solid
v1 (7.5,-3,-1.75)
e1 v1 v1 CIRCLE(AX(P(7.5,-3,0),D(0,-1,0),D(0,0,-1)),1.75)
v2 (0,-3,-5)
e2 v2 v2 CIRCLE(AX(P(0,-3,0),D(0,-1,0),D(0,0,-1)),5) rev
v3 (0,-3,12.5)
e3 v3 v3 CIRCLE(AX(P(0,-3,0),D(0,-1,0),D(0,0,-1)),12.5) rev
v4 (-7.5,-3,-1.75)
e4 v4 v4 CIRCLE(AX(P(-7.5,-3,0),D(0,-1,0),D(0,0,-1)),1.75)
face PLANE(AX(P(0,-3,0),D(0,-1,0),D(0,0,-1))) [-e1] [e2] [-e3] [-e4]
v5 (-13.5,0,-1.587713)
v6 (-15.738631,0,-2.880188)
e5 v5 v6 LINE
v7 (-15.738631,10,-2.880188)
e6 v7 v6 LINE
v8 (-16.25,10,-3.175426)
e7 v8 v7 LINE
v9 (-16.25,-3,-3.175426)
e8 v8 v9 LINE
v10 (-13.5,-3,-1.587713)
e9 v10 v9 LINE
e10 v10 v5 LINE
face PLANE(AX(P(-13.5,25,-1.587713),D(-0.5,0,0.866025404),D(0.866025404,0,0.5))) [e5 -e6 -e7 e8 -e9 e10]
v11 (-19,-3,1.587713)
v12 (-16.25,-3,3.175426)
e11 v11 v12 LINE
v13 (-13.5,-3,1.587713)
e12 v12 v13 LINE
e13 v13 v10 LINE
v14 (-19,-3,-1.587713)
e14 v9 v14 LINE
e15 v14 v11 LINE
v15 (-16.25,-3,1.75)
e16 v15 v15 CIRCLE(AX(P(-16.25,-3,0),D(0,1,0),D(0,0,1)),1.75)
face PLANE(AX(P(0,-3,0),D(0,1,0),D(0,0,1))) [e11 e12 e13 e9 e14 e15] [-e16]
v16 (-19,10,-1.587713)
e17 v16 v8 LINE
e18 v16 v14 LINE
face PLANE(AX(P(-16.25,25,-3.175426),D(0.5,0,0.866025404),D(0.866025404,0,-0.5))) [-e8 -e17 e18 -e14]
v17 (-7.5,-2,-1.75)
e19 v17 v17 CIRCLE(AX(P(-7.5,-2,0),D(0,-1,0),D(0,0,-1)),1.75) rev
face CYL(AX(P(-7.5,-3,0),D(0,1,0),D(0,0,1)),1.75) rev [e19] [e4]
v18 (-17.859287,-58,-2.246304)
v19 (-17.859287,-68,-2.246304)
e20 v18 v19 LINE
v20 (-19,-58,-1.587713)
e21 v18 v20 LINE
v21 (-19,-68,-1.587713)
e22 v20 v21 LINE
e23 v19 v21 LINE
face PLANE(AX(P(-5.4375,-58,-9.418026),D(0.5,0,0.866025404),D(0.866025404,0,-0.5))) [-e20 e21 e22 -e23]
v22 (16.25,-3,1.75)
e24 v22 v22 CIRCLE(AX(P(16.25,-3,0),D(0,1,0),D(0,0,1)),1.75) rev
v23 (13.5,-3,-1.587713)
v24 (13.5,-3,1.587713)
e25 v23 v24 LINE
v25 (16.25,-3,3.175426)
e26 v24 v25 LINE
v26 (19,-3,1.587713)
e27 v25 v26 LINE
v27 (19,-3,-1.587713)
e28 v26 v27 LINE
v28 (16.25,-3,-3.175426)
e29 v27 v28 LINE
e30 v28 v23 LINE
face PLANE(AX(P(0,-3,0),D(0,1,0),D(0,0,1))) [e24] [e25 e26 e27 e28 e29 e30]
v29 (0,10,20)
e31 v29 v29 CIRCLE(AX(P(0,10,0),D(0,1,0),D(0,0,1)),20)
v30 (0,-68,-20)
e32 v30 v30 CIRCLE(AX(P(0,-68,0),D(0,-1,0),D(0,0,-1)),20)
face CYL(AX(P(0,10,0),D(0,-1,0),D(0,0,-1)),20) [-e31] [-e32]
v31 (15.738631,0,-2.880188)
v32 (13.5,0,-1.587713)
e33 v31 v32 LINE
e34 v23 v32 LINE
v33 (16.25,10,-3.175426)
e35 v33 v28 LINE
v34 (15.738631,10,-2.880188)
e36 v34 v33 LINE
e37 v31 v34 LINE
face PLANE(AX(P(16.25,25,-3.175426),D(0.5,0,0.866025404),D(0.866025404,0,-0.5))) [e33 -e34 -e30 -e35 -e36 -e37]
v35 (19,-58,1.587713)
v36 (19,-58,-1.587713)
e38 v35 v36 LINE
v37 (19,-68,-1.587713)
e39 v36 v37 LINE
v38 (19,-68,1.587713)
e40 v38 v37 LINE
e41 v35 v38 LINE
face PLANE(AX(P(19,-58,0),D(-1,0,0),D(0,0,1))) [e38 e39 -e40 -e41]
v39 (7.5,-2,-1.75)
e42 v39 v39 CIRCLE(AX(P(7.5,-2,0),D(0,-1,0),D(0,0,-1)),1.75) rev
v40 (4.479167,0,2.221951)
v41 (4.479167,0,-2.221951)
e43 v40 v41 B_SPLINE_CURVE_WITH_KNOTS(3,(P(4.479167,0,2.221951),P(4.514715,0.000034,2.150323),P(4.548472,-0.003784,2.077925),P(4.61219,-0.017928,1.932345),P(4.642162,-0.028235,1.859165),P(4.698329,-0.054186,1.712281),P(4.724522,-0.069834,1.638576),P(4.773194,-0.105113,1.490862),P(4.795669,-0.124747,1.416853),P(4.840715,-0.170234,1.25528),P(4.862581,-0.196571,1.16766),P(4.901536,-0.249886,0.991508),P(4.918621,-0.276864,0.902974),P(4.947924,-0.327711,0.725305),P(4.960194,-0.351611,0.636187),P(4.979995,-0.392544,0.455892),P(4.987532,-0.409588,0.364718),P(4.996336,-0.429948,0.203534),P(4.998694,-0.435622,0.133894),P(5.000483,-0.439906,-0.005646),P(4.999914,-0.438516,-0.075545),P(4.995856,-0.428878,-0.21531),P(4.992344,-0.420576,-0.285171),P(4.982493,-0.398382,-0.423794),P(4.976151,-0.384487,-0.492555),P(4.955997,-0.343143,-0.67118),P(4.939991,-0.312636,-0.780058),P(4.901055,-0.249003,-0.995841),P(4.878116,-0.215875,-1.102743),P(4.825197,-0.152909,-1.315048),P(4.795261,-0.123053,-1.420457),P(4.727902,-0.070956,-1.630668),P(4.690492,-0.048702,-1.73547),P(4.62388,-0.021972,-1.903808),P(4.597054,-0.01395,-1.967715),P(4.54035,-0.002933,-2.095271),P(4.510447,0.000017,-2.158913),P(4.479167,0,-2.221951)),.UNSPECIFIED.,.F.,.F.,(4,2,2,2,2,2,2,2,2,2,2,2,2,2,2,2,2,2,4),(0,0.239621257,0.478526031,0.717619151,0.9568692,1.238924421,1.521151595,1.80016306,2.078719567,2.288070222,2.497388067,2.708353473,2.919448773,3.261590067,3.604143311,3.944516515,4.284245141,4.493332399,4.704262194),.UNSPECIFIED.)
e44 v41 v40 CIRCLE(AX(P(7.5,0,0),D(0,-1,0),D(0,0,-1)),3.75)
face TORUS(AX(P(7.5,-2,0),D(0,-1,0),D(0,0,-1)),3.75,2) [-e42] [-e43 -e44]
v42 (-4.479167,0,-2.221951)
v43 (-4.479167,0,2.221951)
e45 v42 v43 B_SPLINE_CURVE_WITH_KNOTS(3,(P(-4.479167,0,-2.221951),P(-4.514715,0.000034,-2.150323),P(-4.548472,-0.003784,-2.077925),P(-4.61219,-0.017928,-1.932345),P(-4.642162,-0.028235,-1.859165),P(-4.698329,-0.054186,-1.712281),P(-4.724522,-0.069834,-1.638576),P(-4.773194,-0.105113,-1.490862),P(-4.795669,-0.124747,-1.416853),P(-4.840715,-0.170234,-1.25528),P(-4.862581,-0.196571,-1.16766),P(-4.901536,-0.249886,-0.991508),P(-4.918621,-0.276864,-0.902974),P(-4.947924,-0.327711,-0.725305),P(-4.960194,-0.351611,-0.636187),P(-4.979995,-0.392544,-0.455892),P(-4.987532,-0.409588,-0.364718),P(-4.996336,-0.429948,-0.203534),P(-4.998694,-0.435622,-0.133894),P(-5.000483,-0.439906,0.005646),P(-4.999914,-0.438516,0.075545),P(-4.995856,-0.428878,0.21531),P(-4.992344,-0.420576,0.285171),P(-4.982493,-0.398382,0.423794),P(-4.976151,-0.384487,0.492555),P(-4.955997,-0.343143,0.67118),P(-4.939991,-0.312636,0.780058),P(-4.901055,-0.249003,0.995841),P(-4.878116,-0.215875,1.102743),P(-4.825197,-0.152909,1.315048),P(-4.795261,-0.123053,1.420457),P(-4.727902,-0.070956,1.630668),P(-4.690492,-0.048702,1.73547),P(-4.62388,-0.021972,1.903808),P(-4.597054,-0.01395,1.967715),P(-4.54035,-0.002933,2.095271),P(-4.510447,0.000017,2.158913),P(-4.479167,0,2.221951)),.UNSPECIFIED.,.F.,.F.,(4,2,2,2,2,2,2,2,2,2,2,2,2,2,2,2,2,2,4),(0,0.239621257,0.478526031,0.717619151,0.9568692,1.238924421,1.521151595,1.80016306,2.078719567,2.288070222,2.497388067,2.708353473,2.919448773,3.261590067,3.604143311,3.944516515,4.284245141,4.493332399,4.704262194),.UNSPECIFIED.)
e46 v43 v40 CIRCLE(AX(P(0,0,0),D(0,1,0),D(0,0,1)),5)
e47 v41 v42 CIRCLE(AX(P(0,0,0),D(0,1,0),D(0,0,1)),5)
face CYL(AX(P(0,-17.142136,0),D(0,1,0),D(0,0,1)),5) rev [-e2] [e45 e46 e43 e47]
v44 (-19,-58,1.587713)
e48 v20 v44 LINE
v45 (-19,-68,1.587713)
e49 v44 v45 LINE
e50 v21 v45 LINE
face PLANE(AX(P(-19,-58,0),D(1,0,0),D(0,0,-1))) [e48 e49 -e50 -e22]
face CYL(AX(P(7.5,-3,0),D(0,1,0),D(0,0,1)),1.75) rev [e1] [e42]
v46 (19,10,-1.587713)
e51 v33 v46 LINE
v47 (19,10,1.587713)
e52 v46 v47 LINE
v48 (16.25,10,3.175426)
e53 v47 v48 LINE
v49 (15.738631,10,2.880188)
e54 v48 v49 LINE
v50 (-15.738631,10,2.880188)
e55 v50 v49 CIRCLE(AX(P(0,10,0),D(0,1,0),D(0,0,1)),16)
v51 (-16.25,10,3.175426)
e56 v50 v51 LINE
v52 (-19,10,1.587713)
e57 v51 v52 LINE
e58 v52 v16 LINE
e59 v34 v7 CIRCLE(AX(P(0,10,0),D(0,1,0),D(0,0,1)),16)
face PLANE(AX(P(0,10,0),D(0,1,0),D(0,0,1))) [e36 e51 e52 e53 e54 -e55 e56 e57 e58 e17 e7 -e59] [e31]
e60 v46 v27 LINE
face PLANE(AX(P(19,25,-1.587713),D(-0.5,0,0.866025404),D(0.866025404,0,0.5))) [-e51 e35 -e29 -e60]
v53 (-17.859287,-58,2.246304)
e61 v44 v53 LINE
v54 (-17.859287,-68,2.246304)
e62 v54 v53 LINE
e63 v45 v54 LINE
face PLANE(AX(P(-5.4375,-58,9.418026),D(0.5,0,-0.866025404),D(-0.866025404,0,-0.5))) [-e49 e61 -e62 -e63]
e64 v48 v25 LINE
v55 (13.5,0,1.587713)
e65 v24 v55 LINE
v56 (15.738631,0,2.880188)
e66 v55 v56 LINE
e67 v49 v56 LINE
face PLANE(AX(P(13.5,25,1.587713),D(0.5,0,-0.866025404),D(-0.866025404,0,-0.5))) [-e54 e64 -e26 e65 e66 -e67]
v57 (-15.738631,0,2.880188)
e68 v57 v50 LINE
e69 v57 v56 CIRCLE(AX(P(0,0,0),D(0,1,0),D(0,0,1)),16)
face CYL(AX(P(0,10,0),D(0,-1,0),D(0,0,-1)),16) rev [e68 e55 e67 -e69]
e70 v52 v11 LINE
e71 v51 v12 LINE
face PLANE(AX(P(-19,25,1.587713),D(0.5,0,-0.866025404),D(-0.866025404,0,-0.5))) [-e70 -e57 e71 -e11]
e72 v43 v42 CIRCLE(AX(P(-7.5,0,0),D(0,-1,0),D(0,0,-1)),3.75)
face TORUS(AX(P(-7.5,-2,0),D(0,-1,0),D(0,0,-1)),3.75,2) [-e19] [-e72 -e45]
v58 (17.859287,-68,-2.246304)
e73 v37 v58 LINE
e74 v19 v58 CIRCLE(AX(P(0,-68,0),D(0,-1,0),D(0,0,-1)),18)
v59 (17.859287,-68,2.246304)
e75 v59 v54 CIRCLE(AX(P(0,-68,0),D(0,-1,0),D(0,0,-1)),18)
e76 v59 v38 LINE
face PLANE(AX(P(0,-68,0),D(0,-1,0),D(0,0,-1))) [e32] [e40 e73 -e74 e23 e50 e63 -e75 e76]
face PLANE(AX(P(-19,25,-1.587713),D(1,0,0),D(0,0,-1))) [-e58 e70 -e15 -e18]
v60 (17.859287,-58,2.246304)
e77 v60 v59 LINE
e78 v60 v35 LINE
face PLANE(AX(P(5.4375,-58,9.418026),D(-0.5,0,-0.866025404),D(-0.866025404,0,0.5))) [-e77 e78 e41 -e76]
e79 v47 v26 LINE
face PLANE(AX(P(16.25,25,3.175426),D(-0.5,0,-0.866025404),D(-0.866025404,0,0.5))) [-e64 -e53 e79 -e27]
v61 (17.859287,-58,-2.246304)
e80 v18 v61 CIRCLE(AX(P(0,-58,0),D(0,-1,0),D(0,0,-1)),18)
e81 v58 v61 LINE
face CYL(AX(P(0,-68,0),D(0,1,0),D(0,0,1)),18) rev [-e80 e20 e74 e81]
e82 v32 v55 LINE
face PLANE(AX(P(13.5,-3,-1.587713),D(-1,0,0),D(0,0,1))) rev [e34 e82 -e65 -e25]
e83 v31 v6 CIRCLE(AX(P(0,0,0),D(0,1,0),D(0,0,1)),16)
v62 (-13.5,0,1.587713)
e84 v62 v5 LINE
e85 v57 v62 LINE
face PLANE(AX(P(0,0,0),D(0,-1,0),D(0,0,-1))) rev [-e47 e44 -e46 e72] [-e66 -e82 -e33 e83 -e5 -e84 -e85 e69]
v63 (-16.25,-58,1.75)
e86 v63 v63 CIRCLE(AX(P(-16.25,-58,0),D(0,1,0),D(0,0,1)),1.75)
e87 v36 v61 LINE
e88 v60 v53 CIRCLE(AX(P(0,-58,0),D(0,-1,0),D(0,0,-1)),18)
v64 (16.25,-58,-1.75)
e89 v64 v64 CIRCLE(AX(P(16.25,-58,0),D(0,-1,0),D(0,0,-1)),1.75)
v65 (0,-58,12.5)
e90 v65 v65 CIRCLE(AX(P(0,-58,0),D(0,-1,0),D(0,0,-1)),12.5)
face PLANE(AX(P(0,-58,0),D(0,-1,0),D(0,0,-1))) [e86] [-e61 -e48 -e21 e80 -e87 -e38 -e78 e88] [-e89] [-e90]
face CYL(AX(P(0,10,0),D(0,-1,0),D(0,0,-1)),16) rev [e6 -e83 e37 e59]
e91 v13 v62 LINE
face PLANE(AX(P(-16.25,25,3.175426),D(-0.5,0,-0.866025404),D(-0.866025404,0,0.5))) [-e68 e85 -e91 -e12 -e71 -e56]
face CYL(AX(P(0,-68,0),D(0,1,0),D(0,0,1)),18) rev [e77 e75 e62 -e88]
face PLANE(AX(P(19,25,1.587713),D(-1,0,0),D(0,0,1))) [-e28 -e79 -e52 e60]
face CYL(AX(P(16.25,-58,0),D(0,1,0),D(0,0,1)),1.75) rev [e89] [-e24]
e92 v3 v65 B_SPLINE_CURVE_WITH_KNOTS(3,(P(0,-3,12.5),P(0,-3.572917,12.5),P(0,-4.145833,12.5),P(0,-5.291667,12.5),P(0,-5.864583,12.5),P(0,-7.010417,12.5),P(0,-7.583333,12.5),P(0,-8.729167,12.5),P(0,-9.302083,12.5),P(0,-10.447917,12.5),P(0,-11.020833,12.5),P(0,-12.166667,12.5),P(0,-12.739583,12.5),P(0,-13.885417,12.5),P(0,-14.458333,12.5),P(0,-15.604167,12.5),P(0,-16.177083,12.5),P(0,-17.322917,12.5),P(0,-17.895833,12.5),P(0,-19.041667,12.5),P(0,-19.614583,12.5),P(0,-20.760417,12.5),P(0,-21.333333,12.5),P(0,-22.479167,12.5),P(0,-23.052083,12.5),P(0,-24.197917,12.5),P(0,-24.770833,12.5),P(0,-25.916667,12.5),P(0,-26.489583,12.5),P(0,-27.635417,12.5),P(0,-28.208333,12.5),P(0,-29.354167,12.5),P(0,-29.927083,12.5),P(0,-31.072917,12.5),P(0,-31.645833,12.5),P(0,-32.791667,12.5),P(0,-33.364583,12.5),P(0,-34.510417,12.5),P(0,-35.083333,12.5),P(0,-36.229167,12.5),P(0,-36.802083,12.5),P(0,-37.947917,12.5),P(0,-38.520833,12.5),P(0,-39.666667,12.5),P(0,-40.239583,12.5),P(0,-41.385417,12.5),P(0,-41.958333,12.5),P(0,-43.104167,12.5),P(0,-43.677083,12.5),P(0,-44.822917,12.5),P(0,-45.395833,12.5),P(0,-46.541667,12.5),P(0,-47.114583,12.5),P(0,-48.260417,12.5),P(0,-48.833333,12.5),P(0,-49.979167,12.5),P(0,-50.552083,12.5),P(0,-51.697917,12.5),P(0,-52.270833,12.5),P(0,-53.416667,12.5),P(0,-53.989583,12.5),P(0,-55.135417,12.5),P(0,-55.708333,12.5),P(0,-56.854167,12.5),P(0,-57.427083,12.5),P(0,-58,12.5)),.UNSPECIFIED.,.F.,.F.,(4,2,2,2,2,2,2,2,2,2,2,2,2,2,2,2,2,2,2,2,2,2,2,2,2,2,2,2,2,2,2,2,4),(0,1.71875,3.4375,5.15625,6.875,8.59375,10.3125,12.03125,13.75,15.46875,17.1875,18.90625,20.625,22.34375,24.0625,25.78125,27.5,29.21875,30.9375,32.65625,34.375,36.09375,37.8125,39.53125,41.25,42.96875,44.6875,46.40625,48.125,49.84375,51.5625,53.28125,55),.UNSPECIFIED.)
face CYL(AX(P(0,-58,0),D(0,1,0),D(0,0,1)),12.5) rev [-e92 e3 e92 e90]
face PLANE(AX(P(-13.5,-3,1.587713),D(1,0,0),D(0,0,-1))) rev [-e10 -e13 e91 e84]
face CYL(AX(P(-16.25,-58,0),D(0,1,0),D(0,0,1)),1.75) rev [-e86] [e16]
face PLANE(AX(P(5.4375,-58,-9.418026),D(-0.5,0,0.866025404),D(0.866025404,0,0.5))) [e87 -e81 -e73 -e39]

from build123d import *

# Parameters (mm, degrees)
SKETCH1_R                 = 20
SKETCH1_R_2               = 16
BOSS_EXTRUDE1_DEPTH       = 10
SKETCH2_R                 = 1.75
BOSS_EXTRUDE2_DEPTH       = 3
BOSS_EXTRUDE2_2_DEPTH     = 3
BOSS_EXTRUDE3_OUTLINE_R   = 16
BOSS_EXTRUDE3_OUTLINE_R_2 = 12.5
BOSS_EXTRUDE3_DEPTH       = 58
FILLET1_R                 = 5
BOSS_EXTRUDE4_START       = 10
SKETCH3_R                 = 20
SKETCH3_R_2               = 14.5
BOSS_EXTRUDE4_DEPTH       = 10
CUT_EXTRUDE1_DEPTH        = 25
CUT_EXTRUDE2_DEPTH        = 3
BOSS_EXTRUDE5_START       = 48
SKETCH5_R                 = 20
SKETCH5_R_2               = 12.5
BOSS_EXTRUDE5_DEPTH       = 48
SKETCH6_R                 = 1.75
BOSS_EXTRUDE7_DEPTH       = 3
SKETCH7_R                 = 5
CUT_EXTRUDE3_DEPTH        = 3
CUT_EXTRUDE4_DEPTH        = 62.846584384
CUT_EXTRUDE4_DEPTH_BACK   = 62.846584384
SKETCH9_R                 = 1.75
BOSS_EXTRUDE8_START       = 10
SKETCH10_R                = 20
SKETCH10_R_2              = 18
BOSS_EXTRUDE8_DEPTH       = 10
FILLET5_R                 = 2
CUT_EXTRUDE5_START        = 39.893559
CUT_EXTRUDE5_DEPTH        = 10


# Read off the part's stored shape, not the designer's step: Boss-Extrude3
with BuildPart() as part:
    # Sketch1 → Boss-Extrude1 (new body)
    with BuildSketch(Plane(origin=(0, 0, 0), x_dir=(1, 0, 0), z_dir=(0, 1, 0))):
        with Locations(Location((0, 0, 0), (0, 0, 270))):
            Circle(SKETCH1_R)
        with Locations(Location((0, 0, 0), (0, 0, 270))):
            Circle(SKETCH1_R_2, mode=Mode.SUBTRACT)
    extrude(amount=BOSS_EXTRUDE1_DEPTH)



with BuildPart() as body_2:
    # Sketch2 → Boss-Extrude2 (new body)
    with BuildSketch(Plane(origin=(0, 0, 0), x_dir=(-1, 0, 0), z_dir=(0, -1, 0))):
        with BuildLine():
            Line((-9.387458609, 2), (-15.874507866, 2))
            ThreePointArc((-15.874507866, 2), (-16, 0), (-15.874507866, -2))
            Line((-15.874507866, -2), (-9.387458609, -2))
            ThreePointArc((-9.387458609, -2), (-4.75, 0), (-9.387458609, 2))
        make_face()
        with Locations(Location((-7.5, 0, 0), (0, 0, 90))):
            Circle(SKETCH2_R, mode=Mode.SUBTRACT)
    extrude(amount=BOSS_EXTRUDE2_DEPTH)


with BuildPart() as body_3:
    # Sketch2 → Boss-Extrude2 2 (new body)
    with BuildSketch(Plane(origin=(0, 0, 0), x_dir=(-1, 0, 0), z_dir=(0, -1, 0))):
        with BuildLine():
            Line((9.387458609, -2), (15.874507866, -2))
            ThreePointArc((15.874507866, -2), (16, 0), (15.874507866, 2))
            Line((15.874507866, 2), (9.387458609, 2))
            ThreePointArc((9.387458609, 2), (4.75, 0), (9.387458609, -2))
        make_face()
        with Locations(Location((7.5, 0, 0), (0, 0, 90))):
            Circle(SKETCH2_R, mode=Mode.SUBTRACT)
    extrude(amount=BOSS_EXTRUDE2_2_DEPTH)


    add(body_2.part)  # Boss-Extrude3 merges body 2
    # Boss-Extrude3 outline → Boss-Extrude3 (add)
    with BuildSketch(Plane(origin=(0, 0, 0), x_dir=(-1, 0, 0), z_dir=(0, -1, 0))):
        Circle(BOSS_EXTRUDE3_OUTLINE_R)
        Circle(BOSS_EXTRUDE3_OUTLINE_R_2, mode=Mode.SUBTRACT)
    extrude(amount=BOSS_EXTRUDE3_DEPTH)

    # Fillet1
    # the kernel refuses this fillet: 5 mm, written as the material it adds along each edge
    with BuildSketch(Plane(origin=(-12.338962679, -3, 2), x_dir=(0.44041013703938037, 0, 0.8977966981410402), z_dir=(0, 1, 0)), Plane(origin=(12.338962679, -3, -2), x_dir=(-0.4404101370393726, 0, -0.897796698141044), z_dir=(0, 1, 0))) as fillet1_piece_1:
        with BuildLine():
            CenterArc((5.821777357, 4.78348009), FILLET1_R, 205.259956012, 81.663200185)
            Line((1.299872312, 2.649850609), (1.209434211, 2.607178019))
            ThreePointArc((1.209434211, 2.607178019), (0.560156486, 1.368966318), (-0.08977967, 0.044041014))
            Line((-0.08977967, 0.044041014), (-0.029108887, -0.095669602))
            ThreePointArc((-0.029108887, -0.095669602), (3.638610848, -0.641299774), (7.306330583, -0.095669602))
            Line((7.306330583, -0.095669602), (7.277221696, 0))
        make_face()
    extrude(amount=3)
    with BuildSketch(Plane(origin=(-12.338962679, -3, -2), x_dir=(0.44041013703938064, 0, -0.8977966981410401), z_dir=(0, 1, 0)), Plane(origin=(12.338962679, -3, 2), x_dir=(-0.44041013703937265, 0, 0.8977966981410441), z_dir=(0, 1, 0))) as fillet1_piece_2:
        with BuildLine():
            CenterArc((5.821777357, -4.78348009), FILLET1_R, 73.076843803, 81.663200185)
            Line((1.299872312, -2.649850609), (1.209434211, -2.607178019))
            ThreePointArc((1.209434211, -2.607178019), (0.560156486, -1.368966318), (-0.08977967, -0.044041014))
            Line((-0.08977967, -0.044041014), (-0.029108887, 0.095669602))
            ThreePointArc((-0.029108887, 0.095669602), (3.638610848, 0.641299774), (7.306330583, 0.095669602))
            Line((7.306330583, 0.095669602), (7.277221696, 0))
        make_face()
    extrude(amount=3)


with BuildPart() as part_1:
    add(part.part)

    add(body_3.part)  # Boss-Extrude4 merges body 3
    # Sketch3 → Boss-Extrude4 (add)
    with BuildSketch(Plane(origin=(0, 0, 0), x_dir=(-1, 0, 0), z_dir=(0, -1, 0)).offset(BOSS_EXTRUDE4_START)):
        with Locations(Location((0, 0, 0), (0, 0, 90))):
            Circle(SKETCH3_R)
        Circle(SKETCH3_R_2, mode=Mode.SUBTRACT)
    extrude(amount=-BOSS_EXTRUDE4_DEPTH)

    # Sketch4 → Cut-Extrude1 (cut)
    with BuildSketch(Plane(origin=(0, 0, 0), x_dir=(1, 0, 0), z_dir=(0, 1, 0))):
        Polygon((-16.25, 3.175426481), (-19, 1.58771324), (-19, -1.58771324), (-16.25, -3.175426481), (-13.5, -1.58771324), (-13.5, 1.58771324), align=None)
        Polygon((16.25, 3.175426481), (13.5, 1.58771324), (13.5, -1.58771324), (16.25, -3.175426481), (19, -1.58771324), (19, 1.58771324), align=None)
    extrude(amount=CUT_EXTRUDE1_DEPTH, mode=Mode.SUBTRACT)

    # Sketch4<3> → Cut-Extrude2 (cut)
    with BuildSketch(Plane(origin=(0, 0, 0), x_dir=(1, 0, 0), z_dir=(0, 1, 0))):
        Polygon((-16.25, 3.175426481), (-19, 1.58771324), (-19, -1.58771324), (-16.25, -3.175426481), (-13.5, -1.58771324), (-13.5, 1.58771324), align=None)
        Polygon((16.25, 3.175426481), (13.5, 1.58771324), (13.5, -1.58771324), (16.25, -3.175426481), (19, -1.58771324), (19, 1.58771324), align=None)
    extrude(amount=-CUT_EXTRUDE2_DEPTH, mode=Mode.SUBTRACT)

    # Sketch5 → Boss-Extrude5 (add)
    with BuildSketch(Plane(origin=(0, -10, 0), x_dir=(-1, 0, 0), z_dir=(0, -1, 0)).offset(BOSS_EXTRUDE5_START)):
        with Locations(Location((0, 0, 0), (0, 0, 90))):
            Circle(SKETCH5_R)
        with Locations(Location((0, 0, 0), (0, 0, 223.053208616))):
            Circle(SKETCH5_R_2, mode=Mode.SUBTRACT)
    extrude(amount=-BOSS_EXTRUDE5_DEPTH)

    # Sketch6 → Boss-Extrude7 (add)
    # profile 1 of 3: a face of its own
    with BuildSketch(Plane(origin=(0, 0, 0), x_dir=(1, 0, 0), z_dir=(0, 1, 0))):
        with BuildLine():
            ThreePointArc((9.387458609, 2), (4.75, 0), (9.387458609, -2))
            ThreePointArc((9.387458609, -2), (10.476642124, -5.313902708), (9.134000475, -8.533465611))
            ThreePointArc((9.134000475, -8.533465611), (0, -12.5), (-9.134000475, -8.533465611))
            ThreePointArc((-9.134000475, -8.533465611), (-10.476642124, -5.313902708), (-9.387458609, -2))
            ThreePointArc((-9.387458609, -2), (-4.75, 0), (-9.387458609, 2))
            ThreePointArc((-9.387458609, 2), (-10.476642124, 5.313902708), (-9.134000475, 8.533465611))
            ThreePointArc((-9.134000475, 8.533465611), (0, 12.5), (9.134000475, 8.533465611))
            ThreePointArc((9.134000475, 8.533465611), (10.476642124, 5.313902708), (9.387458609, 2))
        make_face()
    # profile 2 of 3: a face of its own
    with BuildSketch(Plane(origin=(0, 0, 0), x_dir=(1, 0, 0), z_dir=(0, 1, 0))):
        with BuildLine():
            ThreePointArc((-9.387458609, 2), (-10.476642124, 5.313902708), (-9.134000475, 8.533465611))
            ThreePointArc((-9.134000475, 8.533465611), (-12.5, 0), (-9.134000475, -8.533465611))
            ThreePointArc((-9.134000475, -8.533465611), (-10.476642124, -5.313902708), (-9.387458609, -2))
            ThreePointArc((-9.387458609, -2), (-4.75, 0), (-9.387458609, 2))
        make_face()
        with Locations(Location((-7.5, 0, 0), (0, 0, 90))):
            Circle(SKETCH6_R, mode=Mode.SUBTRACT)
    # profile 3 of 3: a face of its own
    with BuildSketch(Plane(origin=(0, 0, 0), x_dir=(1, 0, 0), z_dir=(0, 1, 0))):
        with BuildLine():
            ThreePointArc((9.134000475, -8.533465611), (11.628091114, -4.586665132), (12.5, 0))
            ThreePointArc((12.5, 0), (11.628091114, 4.586665132), (9.134000475, 8.533465611))
            ThreePointArc((9.134000475, 8.533465611), (10.476642124, 5.313902708), (9.387458609, 2))
            ThreePointArc((9.387458609, 2), (4.75, 0), (9.387458609, -2))
            ThreePointArc((9.387458609, -2), (10.476642124, -5.313902708), (9.134000475, -8.533465611))
        make_face()
        with Locations(Location((7.5, 0, 0), (0, 0, 90))):
            Circle(SKETCH6_R, mode=Mode.SUBTRACT)
    extrude(amount=-BOSS_EXTRUDE7_DEPTH)

    # Sketch7 → Cut-Extrude3 (cut)
    with BuildSketch(Plane(origin=(0, 0, 0), x_dir=(1, 0, 0), z_dir=(0, 1, 0))):
        with Locations(Location((0, 0, 0), (0, 0, 270))):
            Circle(SKETCH7_R)
    extrude(amount=-CUT_EXTRUDE3_DEPTH, mode=Mode.SUBTRACT)

    # Sketch9 → Cut-Extrude4 (cut, two sides: drawn at the far end of the back side and taken through both)
    with BuildSketch(Plane(origin=(0, -3, 0), x_dir=(1, 0, 0), z_dir=(0, 1, 0)).offset(-CUT_EXTRUDE4_DEPTH_BACK)):
        with Locations(Location((-16.25, 0, 0), (0, 0, 270))):
            Circle(SKETCH9_R)
        with Locations(Location((16.25, 0, 0), (0, 0, 270))):
            Circle(SKETCH9_R)
    extrude(amount=CUT_EXTRUDE4_DEPTH + CUT_EXTRUDE4_DEPTH_BACK, mode=Mode.SUBTRACT)

    # Sketch10 → Boss-Extrude8 (add)
    with BuildSketch(Plane(origin=(0, -58, 0), x_dir=(-1, 0, 0), z_dir=(0, -1, 0)).offset(BOSS_EXTRUDE8_START)):
        with Locations(Location((0, 0, 0), (0, 0, 90))):
            Circle(SKETCH10_R)
        Circle(SKETCH10_R_2, mode=Mode.SUBTRACT)
    extrude(amount=-BOSS_EXTRUDE8_DEPTH)

    # Fillet5
    # the kernel refuses this fillet: 2 mm, written as the material it takes off along each edge
    with BuildSketch(Plane(origin=(7.5, 0, 0), x_dir=(0, 0, -1), z_dir=(-1, 0, 0))) as fillet5_piece_1:
        with BuildLine():
            CenterArc((1.75 + FILLET5_R, FILLET5_R), FILLET5_R, 180, 90)
            Line((1.75 + FILLET5_R, 0), (1.75, 0))
            Line((1.75, 0), (1.75, FILLET5_R))
        make_face()
    revolve(axis=Axis((7.5, 0, 0), (0, -1, 0)), mode=Mode.SUBTRACT)
    with BuildSketch(Plane(origin=(-7.5, 0, 0), x_dir=(0, 0, -1), z_dir=(-1, 0, 0))) as fillet5_piece_2:
        with BuildLine():
            CenterArc((1.75 + FILLET5_R, FILLET5_R), FILLET5_R, 180, 90)
            Line((1.75 + FILLET5_R, 0), (1.75, 0))
            Line((1.75, 0), (1.75, FILLET5_R))
        make_face()
    revolve(axis=Axis((-7.5, 0, 0), (0, -1, 0)), mode=Mode.SUBTRACT)

    # Sketch11 → Cut-Extrude5 (cut)
    with BuildSketch(Plane(origin=(0, -107.893559475, 0), x_dir=(1, 0, 0), z_dir=(0, 1, 0)).offset(CUT_EXTRUDE5_START)):
        Polygon((16.25, 3.175426481), (13.5, 1.58771324), (13.5, -1.58771324), (16.25, -3.175426481), (19, -1.58771324), (19, 1.58771324), align=None)
        Polygon((-16.25, 3.175426481), (-19, 1.58771324), (-19, -1.58771324), (-16.25, -3.175426481), (-13.5, -1.58771324), (-13.5, 1.58771324), align=None)
    extrude(amount=CUT_EXTRUDE5_DEPTH, mode=Mode.SUBTRACT)


solid = part_1.part
